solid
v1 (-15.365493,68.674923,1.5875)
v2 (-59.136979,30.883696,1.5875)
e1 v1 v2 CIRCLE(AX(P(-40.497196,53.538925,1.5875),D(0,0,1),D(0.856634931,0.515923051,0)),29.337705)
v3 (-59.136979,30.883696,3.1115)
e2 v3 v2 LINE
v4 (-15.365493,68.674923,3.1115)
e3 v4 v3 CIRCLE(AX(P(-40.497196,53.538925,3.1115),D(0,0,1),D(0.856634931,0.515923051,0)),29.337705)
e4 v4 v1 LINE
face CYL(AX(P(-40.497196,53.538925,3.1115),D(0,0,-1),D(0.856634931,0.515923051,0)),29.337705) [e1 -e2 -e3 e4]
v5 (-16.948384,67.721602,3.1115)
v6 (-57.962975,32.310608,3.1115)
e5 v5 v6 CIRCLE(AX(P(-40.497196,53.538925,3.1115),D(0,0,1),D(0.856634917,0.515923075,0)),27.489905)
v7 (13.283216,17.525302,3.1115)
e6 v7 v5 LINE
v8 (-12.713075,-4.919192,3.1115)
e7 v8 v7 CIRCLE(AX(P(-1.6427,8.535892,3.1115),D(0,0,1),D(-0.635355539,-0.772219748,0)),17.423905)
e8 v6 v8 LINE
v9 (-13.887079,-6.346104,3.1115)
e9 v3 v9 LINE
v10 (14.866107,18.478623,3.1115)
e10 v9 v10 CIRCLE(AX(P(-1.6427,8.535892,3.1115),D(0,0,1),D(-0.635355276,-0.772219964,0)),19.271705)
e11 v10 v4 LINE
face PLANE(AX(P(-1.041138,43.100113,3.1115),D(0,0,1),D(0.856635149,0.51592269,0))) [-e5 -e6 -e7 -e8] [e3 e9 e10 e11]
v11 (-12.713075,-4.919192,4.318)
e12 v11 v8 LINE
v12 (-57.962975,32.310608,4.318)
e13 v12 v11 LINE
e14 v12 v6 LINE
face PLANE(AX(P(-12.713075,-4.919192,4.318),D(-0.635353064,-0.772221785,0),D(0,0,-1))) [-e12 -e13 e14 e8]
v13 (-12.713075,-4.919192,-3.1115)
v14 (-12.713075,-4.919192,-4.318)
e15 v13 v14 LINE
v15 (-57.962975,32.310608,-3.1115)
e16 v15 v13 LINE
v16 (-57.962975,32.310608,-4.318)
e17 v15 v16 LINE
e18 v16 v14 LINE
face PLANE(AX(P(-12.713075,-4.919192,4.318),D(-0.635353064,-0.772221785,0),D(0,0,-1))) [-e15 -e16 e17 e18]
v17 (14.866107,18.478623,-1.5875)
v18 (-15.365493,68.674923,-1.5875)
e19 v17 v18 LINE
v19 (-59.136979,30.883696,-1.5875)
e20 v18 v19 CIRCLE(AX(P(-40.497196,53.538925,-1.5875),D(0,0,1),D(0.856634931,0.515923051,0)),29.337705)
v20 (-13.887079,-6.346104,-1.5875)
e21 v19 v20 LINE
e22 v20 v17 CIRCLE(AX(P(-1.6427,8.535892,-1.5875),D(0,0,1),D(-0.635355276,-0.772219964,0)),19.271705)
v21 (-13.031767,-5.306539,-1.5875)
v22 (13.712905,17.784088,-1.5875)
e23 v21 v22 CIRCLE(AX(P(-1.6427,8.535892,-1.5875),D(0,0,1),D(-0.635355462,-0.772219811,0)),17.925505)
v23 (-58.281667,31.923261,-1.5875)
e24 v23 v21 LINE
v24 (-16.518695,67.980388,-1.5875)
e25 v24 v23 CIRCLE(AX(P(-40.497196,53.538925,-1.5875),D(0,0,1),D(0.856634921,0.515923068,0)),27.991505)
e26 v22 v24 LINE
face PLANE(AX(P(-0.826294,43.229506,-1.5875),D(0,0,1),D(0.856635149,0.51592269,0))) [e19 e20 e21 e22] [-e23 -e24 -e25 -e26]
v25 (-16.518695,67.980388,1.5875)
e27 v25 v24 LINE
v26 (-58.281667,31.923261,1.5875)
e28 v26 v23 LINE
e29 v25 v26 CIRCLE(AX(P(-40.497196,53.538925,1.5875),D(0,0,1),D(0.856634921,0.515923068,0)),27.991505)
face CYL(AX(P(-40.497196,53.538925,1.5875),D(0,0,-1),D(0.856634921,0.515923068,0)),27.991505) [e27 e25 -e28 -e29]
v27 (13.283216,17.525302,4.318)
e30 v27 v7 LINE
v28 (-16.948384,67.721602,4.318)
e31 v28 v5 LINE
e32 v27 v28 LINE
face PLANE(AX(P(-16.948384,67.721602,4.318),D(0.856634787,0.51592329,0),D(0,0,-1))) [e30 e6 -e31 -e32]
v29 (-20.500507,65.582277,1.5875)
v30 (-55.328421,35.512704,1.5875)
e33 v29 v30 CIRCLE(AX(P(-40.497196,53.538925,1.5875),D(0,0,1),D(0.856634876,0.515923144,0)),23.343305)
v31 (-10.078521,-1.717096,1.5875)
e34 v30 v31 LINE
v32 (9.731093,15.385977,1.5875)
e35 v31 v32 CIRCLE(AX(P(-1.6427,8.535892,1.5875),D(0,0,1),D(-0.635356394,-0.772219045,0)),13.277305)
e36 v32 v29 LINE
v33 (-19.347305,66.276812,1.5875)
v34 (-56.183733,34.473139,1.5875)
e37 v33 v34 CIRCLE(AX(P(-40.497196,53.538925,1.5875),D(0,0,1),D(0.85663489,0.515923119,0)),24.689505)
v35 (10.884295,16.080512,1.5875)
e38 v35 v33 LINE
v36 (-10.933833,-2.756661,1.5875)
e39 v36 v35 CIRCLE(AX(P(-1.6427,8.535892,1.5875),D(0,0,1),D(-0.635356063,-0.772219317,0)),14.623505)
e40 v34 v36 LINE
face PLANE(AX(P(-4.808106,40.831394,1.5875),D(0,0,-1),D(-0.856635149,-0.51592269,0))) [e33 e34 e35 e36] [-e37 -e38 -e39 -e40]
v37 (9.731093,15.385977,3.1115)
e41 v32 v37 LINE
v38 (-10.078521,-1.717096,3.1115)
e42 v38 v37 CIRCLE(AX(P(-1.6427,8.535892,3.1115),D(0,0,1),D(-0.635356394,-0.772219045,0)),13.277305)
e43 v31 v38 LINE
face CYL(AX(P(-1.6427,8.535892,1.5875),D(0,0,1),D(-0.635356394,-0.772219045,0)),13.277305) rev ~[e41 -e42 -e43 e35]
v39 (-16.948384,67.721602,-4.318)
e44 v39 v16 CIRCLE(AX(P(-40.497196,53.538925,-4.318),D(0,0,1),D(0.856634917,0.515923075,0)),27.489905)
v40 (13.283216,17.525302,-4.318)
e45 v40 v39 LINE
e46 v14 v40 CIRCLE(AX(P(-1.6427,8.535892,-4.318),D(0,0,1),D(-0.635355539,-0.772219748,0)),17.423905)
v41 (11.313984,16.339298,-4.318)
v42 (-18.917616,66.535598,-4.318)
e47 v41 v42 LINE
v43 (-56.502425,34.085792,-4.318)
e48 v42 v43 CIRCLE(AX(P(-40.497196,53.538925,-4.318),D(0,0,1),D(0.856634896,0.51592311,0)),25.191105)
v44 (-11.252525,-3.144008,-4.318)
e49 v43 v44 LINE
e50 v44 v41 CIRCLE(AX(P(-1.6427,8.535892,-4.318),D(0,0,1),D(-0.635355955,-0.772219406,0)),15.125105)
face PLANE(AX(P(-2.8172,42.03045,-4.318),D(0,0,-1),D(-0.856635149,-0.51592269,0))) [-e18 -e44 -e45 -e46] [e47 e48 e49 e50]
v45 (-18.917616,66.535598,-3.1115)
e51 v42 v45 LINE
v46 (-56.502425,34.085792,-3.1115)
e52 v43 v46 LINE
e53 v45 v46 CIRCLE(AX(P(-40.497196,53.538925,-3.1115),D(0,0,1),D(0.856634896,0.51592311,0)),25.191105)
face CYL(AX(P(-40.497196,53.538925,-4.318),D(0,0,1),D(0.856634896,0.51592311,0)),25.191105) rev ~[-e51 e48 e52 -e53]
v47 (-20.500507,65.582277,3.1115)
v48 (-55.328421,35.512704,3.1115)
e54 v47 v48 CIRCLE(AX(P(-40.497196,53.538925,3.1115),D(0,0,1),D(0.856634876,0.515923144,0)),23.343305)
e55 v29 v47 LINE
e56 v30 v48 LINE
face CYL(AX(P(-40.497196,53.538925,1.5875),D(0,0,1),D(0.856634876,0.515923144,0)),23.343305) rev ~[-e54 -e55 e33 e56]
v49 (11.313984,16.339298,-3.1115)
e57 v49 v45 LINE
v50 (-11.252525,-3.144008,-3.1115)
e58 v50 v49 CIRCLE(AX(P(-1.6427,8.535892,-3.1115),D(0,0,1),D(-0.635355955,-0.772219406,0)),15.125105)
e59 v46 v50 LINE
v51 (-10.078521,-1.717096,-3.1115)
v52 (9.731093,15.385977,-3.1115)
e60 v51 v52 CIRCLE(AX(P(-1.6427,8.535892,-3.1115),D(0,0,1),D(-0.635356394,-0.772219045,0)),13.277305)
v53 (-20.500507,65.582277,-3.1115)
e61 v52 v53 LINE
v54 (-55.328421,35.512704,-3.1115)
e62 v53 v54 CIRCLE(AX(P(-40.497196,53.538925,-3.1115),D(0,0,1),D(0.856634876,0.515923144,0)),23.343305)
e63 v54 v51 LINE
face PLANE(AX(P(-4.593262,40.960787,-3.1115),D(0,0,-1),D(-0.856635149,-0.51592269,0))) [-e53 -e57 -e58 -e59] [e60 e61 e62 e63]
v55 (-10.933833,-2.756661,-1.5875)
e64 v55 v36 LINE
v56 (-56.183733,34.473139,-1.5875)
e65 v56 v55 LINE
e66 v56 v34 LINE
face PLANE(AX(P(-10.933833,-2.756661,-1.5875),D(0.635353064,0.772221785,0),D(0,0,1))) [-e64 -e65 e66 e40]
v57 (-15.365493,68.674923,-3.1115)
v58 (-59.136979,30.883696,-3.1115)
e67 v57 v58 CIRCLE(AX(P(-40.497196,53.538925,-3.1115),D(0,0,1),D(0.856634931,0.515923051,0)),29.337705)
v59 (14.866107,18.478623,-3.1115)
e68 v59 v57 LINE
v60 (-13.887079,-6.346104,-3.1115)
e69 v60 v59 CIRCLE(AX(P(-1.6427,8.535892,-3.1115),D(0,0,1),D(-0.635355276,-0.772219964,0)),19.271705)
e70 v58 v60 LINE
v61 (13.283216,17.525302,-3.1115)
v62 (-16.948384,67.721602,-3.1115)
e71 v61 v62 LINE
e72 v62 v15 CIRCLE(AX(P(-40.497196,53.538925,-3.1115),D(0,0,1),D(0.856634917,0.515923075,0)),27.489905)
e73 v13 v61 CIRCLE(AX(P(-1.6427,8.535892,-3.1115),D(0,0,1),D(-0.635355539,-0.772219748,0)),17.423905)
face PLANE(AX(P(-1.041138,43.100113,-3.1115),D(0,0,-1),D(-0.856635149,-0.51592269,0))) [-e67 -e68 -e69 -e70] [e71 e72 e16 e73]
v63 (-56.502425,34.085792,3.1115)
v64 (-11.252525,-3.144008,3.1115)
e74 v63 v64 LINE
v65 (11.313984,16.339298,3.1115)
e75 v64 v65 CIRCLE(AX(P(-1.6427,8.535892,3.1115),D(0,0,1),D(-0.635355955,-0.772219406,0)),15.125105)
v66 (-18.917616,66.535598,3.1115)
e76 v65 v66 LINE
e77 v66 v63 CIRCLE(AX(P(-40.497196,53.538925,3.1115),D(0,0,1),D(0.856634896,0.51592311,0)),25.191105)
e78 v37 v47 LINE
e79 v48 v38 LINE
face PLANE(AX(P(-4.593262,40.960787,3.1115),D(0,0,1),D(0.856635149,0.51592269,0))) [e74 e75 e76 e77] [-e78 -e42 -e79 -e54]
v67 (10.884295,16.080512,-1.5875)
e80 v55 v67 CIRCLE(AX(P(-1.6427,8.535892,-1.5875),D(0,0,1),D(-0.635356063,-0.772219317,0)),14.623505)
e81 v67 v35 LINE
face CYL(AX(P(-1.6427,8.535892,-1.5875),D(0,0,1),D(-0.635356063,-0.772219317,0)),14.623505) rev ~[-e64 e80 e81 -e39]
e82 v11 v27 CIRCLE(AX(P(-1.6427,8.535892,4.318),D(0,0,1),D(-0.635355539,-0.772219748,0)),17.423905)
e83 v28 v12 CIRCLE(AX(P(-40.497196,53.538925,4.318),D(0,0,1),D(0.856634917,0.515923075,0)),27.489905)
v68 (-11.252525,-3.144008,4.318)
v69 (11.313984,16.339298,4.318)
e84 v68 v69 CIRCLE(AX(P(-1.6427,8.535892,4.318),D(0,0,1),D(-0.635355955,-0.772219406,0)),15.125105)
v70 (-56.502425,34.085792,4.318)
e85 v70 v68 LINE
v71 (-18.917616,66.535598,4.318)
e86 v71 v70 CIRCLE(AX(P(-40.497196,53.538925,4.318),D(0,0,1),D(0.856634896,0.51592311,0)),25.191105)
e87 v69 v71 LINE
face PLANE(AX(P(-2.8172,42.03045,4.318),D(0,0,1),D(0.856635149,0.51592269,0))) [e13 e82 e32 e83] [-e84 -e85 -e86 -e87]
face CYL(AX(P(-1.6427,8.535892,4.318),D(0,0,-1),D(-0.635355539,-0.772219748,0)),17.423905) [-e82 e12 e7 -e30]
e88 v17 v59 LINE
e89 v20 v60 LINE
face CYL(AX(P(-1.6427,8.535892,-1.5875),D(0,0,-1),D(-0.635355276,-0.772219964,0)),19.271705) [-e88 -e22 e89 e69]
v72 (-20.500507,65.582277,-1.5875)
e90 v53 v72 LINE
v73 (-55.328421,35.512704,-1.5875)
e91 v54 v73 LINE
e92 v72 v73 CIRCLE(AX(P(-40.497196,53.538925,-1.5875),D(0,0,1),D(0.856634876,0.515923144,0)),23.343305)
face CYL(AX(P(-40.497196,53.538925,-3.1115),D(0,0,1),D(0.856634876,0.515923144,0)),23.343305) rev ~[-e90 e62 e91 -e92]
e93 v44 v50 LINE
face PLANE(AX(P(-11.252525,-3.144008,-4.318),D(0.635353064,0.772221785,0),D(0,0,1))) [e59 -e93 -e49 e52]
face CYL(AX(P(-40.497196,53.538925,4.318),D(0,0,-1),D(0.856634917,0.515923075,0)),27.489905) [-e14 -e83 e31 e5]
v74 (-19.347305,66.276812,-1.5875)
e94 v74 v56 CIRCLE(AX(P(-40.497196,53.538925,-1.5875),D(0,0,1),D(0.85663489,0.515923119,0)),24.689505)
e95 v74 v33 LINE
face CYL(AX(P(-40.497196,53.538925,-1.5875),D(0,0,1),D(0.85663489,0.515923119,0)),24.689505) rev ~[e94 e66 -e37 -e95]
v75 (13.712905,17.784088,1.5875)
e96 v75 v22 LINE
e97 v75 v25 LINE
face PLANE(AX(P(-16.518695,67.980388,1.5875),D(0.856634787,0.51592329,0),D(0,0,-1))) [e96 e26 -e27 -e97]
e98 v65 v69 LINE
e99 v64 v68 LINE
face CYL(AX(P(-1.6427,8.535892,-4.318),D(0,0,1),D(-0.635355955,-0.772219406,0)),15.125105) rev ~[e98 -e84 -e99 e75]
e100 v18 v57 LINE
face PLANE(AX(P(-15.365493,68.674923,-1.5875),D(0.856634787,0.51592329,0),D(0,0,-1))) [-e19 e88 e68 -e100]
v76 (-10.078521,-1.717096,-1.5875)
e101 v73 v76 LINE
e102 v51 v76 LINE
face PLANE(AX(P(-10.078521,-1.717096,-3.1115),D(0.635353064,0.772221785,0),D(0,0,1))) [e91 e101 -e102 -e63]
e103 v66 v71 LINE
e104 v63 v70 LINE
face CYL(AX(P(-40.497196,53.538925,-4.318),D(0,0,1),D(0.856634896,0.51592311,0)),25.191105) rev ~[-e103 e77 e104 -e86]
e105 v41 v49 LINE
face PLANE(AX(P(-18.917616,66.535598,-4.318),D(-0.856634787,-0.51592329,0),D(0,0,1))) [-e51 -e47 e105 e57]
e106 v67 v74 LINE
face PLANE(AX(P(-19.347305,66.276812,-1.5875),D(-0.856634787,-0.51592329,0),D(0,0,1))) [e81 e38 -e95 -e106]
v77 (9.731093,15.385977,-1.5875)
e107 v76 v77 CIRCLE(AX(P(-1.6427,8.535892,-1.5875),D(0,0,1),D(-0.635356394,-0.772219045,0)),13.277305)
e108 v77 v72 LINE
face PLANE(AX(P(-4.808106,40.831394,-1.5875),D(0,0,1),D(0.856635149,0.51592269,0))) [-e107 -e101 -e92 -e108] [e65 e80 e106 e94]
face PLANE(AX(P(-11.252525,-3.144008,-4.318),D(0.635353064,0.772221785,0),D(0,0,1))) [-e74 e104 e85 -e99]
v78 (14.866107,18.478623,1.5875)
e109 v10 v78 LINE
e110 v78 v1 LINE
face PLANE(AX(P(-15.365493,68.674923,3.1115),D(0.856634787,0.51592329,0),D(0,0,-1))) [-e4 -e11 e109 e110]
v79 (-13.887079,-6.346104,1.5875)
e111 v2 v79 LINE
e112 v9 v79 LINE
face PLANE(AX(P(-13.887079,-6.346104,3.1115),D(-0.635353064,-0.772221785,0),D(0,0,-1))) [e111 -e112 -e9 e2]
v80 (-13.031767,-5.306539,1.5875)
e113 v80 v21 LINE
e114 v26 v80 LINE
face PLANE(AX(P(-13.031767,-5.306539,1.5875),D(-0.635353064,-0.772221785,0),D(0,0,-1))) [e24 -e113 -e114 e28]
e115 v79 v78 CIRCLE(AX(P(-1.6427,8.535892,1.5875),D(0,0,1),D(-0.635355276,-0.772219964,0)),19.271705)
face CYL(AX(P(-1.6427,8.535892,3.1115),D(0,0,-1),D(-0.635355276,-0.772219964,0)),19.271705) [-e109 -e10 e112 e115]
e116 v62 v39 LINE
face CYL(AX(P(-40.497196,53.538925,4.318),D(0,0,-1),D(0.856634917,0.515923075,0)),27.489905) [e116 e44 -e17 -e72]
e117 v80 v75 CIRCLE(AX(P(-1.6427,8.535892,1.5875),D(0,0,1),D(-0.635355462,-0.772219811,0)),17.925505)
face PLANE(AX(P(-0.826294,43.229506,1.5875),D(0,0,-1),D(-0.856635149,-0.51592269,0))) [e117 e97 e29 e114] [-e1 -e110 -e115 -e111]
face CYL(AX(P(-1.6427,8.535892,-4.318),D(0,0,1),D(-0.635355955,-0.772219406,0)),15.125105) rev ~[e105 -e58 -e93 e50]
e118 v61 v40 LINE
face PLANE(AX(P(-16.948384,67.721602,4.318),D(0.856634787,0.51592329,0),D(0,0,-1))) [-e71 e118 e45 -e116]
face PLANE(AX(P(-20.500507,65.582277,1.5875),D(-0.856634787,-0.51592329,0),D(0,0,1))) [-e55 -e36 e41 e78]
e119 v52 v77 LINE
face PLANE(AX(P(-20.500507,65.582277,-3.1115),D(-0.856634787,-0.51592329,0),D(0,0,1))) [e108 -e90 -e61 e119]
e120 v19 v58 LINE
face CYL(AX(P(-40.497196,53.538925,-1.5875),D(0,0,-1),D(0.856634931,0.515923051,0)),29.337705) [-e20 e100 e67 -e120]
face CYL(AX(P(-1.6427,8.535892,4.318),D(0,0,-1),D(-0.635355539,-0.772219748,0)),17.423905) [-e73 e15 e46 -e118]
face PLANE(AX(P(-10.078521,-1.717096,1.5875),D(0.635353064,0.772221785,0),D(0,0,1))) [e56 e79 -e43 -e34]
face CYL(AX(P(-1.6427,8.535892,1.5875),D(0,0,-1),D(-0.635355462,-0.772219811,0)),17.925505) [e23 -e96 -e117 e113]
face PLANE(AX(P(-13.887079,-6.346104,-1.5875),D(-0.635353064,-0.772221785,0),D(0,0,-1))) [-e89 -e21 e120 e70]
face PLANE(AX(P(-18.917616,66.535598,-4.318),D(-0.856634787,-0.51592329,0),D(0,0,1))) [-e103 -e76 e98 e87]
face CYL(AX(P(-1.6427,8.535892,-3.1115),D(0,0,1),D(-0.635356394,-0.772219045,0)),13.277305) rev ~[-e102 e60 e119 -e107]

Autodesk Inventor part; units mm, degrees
ref_plane "РабПлоскость2" through (-40.4972, 53.5389, 0) normal (-1, 0, 0) x (0, 0, 1)
ref_plane "РабПлоскость3" through (-1.6427, 8.5359, 0) normal (-0.3338521, 0.9426255, 0) x (0, 0, 1)
sketch "Траектория" plane through (0, 0, 0) normal (0, 0, 1) x (1, 0, 0)
  arc A0 (-17.933, 67.1286) -> (-57.2327, 33.1982) centre (-40.4972, 53.5389) ccw
  arc A1 (-11.9828, -4.0316) -> (12.2986, 16.9323) centre (-1.6427, 8.5359) ccw
  line L0 (-11.9828, -4.0316) -> (-57.2327, 33.1982)
  line L1 (-17.933, 67.1286) -> (12.2986, 16.9323)
  dimension "d31" = 5.9944
ref_plane "Секущая плоскость" through (-57.2327, 33.1982, 0) normal (0.772222, -0.6353528, 0) x (0, 0, 1)
sketch "Эскиз сечения" plane through (-57.2327, 33.1982, 0) normal (0.772222, -0.6353528, 0) x (0, 0, 1)
  line L0 (-4.318, -1.1494) -> (4.318, -1.1494)
  line L1 (4.318, -1.1494) -> (4.318, 1.1494)
  line L2 (4.318, 1.1494) -> (-4.318, 1.1494)
  line L3 (-4.318, 1.1494) -> (-4.318, -1.1494)
  line L4 (-1.5875, -1.651) -> (1.5875, -1.651)
  line L5 (1.5875, -1.651) -> (1.5875, 1.651)
  line L6 (1.5875, 1.651) -> (-1.5875, 1.651)
  line L7 (-1.5875, 1.651) -> (-1.5875, -1.651)
  line L8 (-1.5875, 0) -> (1.5875, 0) construction
  line L9 (-3.1115, -2.9972) -> (-1.5875, -2.9972)
  line L10 (-1.5875, -2.9972) -> (-1.5875, 2.9972)
  line L11 (-1.5875, 2.9972) -> (-3.1115, 2.9972)
  line L12 (-3.1115, 2.9972) -> (-3.1115, -2.9972)
  line L13 (1.5875, -2.9972) -> (3.1115, -2.9972)
  line L14 (3.1115, -2.9972) -> (3.1115, 2.9972)
  line L15 (3.1115, 2.9972) -> (1.5875, 2.9972)
  line L16 (1.5875, 2.9972) -> (1.5875, -2.9972)
  line L17 (-4.318, 0) -> (4.318, 0) construction
  point P0 (0, 0)
  point P1 (0, 0)
  dimension "d21" = 2.2987
  dimension "d22" = 3.302
  dimension "d23" = 3.175
  dimension "d24" = 1.524
  dimension "d31" = 5.9944
  dimension "d32" = 8.636
sweep "Тело" add profiles "Эскиз сечения" path "Траектория"
pattern_of_one "Strand Pattern"
equation "\"d21\" = da_d2"
equation "\"d22\" = da_d1"
equation "\"d23\" = da_b1"
equation "\"d24\" = da_t1 + da_t2"
equation "\"d30\" = da_pt"
equation "\"da_p\" = 6.35"
equation "\"da_b1\" = 3.175"
equation "\"da_h2\" = 5.9944"
equation "\"da_h3\" = 5.207"
equation "\"da_d1\" = 3.302"
equation "\"da_d2\" = 2.2987"
equation "\"da_pt\" = 6.4008"
equation "\"da_b\" = 8.636"
equation "\"da_t1\" = 0.762"
equation "\"da_t2\" = 0.762"
properties part number "Цепь роликовая"
